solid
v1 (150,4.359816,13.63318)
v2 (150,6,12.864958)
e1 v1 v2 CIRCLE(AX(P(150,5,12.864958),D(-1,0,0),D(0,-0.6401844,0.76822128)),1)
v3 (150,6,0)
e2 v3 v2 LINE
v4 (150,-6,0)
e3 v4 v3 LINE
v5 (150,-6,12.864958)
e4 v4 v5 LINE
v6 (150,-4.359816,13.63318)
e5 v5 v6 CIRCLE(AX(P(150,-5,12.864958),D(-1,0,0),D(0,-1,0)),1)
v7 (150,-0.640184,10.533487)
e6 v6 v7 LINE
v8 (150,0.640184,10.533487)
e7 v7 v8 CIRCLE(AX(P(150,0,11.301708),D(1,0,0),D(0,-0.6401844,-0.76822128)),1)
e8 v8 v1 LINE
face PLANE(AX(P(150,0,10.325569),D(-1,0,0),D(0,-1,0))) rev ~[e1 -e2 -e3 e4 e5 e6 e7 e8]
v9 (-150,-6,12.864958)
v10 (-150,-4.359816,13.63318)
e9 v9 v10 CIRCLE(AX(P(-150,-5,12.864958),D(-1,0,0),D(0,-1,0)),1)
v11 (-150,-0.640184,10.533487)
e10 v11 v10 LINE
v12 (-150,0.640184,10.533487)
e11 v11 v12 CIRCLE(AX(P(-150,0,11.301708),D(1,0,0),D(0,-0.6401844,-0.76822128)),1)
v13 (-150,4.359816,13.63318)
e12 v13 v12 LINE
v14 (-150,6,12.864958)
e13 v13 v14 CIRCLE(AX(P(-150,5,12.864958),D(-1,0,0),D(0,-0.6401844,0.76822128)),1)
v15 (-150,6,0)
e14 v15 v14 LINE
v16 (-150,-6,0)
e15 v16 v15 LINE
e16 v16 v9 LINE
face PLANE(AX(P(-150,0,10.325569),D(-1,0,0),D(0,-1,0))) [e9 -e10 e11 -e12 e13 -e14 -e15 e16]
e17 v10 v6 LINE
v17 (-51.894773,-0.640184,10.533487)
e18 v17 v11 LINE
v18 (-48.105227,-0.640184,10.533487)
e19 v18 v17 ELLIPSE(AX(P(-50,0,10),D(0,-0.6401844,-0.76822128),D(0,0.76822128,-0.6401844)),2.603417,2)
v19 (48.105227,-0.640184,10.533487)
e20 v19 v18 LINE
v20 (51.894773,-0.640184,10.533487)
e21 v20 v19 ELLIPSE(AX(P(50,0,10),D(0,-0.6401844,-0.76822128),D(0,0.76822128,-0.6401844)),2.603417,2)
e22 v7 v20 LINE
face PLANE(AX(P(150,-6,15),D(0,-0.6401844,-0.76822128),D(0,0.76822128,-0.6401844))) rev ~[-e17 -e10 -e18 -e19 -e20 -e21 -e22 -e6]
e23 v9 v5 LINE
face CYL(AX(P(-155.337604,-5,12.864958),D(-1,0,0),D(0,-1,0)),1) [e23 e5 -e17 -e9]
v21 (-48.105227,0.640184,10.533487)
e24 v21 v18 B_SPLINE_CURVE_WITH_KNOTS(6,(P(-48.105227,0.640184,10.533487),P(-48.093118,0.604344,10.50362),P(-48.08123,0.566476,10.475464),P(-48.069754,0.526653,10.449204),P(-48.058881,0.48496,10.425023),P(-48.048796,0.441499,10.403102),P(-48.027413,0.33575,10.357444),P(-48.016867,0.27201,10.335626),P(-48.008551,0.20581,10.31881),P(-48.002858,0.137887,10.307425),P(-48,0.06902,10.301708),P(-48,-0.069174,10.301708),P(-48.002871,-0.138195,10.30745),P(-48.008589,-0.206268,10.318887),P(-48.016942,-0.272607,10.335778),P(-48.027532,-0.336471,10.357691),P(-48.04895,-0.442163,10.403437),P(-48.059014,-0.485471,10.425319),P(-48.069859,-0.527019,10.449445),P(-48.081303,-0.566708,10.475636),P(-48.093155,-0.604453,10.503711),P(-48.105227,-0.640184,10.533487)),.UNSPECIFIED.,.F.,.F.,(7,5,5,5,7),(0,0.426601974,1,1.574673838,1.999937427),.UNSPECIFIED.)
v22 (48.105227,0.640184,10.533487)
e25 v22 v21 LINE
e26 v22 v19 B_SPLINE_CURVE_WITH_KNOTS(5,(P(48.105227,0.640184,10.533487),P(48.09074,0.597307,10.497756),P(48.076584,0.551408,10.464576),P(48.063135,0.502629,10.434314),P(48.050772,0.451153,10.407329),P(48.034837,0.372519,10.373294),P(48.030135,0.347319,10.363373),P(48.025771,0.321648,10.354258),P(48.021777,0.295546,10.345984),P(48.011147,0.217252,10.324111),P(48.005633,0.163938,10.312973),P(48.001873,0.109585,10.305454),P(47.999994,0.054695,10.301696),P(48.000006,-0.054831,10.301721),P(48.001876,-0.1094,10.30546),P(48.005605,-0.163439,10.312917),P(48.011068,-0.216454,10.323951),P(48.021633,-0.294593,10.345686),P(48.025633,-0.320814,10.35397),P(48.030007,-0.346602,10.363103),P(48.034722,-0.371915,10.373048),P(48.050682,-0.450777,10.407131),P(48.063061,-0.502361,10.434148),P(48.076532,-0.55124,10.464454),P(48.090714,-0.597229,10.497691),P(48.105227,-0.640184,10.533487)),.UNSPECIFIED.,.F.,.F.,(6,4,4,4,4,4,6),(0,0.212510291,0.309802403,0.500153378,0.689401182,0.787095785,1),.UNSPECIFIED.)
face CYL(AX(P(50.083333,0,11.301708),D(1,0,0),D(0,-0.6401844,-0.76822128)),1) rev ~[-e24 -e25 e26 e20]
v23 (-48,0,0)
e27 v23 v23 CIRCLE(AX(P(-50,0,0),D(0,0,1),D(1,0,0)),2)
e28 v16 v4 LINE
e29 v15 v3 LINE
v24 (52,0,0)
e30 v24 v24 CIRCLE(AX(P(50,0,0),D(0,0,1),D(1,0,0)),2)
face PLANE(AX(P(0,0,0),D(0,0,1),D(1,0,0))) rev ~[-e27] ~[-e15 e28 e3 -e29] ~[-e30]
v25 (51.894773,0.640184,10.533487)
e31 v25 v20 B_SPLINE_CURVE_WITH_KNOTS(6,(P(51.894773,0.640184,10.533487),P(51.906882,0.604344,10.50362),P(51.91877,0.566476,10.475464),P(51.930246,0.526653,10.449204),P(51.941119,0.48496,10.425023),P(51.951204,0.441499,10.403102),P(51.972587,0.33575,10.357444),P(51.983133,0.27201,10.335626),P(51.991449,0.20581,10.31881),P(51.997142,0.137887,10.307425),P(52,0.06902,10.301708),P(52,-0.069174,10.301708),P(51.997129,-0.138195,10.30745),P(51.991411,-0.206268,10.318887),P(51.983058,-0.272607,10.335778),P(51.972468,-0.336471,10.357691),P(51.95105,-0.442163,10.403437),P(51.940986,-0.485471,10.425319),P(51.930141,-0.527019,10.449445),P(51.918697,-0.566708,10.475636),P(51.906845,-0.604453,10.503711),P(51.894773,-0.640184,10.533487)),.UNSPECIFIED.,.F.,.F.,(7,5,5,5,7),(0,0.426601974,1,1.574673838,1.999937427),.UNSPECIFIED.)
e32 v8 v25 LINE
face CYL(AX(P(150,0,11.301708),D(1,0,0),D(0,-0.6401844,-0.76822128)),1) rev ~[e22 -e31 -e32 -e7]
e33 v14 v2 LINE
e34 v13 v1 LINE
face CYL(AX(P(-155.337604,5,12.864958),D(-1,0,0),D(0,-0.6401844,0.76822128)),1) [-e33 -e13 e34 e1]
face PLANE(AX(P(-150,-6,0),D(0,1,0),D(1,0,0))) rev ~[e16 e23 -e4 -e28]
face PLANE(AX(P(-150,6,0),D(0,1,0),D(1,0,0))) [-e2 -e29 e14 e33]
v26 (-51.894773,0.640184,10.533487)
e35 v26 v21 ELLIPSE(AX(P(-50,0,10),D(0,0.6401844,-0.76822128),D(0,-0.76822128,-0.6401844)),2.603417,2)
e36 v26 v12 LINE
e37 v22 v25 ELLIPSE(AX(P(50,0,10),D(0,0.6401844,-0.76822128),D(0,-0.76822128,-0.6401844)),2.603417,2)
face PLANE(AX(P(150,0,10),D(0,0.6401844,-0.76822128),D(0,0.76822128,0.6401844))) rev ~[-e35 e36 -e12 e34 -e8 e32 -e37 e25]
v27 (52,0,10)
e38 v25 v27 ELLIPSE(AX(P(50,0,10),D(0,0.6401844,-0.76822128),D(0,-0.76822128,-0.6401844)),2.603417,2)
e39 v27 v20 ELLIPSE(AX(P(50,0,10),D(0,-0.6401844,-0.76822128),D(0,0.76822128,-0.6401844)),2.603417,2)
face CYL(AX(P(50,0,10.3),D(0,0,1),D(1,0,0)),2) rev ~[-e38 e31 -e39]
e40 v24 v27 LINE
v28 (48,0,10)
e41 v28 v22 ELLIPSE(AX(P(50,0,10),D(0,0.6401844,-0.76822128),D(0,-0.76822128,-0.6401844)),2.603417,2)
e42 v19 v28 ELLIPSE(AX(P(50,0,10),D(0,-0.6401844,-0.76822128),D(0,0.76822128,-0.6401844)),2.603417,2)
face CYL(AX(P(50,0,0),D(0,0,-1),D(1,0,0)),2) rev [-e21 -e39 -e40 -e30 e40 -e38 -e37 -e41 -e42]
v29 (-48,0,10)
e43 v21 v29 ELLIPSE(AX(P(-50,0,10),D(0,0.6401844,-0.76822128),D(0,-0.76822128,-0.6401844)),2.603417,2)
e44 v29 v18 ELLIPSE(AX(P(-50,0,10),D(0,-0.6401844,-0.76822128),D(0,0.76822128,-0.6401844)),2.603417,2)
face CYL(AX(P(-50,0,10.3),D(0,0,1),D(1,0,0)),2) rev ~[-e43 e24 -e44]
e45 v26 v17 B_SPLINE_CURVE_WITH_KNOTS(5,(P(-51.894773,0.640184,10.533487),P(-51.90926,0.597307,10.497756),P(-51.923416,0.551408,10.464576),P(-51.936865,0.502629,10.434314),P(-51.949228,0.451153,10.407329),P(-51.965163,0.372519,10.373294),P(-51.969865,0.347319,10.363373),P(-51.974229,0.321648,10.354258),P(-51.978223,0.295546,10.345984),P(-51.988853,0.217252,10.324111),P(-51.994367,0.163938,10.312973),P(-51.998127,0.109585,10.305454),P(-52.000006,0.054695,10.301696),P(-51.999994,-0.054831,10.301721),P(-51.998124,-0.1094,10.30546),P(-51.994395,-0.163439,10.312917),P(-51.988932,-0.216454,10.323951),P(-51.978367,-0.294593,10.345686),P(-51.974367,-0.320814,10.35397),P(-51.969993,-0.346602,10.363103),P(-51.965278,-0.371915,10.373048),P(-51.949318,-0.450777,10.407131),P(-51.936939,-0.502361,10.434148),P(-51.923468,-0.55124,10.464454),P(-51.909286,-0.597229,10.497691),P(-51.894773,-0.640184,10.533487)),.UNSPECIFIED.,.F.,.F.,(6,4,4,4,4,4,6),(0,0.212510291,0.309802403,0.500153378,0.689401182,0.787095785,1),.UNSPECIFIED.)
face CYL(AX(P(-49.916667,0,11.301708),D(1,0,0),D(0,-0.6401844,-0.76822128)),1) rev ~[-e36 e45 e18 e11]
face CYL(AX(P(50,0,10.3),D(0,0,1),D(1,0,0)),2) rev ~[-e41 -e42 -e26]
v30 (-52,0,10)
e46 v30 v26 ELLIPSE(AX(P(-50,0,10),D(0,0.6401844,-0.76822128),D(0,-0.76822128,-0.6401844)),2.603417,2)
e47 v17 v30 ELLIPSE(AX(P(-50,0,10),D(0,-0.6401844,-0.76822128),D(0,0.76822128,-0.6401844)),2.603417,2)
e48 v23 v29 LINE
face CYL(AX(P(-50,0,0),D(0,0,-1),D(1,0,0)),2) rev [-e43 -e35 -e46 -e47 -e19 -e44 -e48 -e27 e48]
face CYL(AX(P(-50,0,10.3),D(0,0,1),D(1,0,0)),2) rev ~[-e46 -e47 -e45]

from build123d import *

# Parameters (mm, degrees)
F0_W         = 300
F0_H         = 12
F0_R         = 2
F1_DEPTH     = 15
F3_DEPTH     = 300.001
F4_T4_DEPTH  = 100.0833333333
F4_S5_R      = 2
F4_T6_DEPTH  = 52
F4_T10_DEPTH = 100.1666666667
F4_S11_R     = 2
F4_T12_DEPTH = 52
F4_S13_R     = 2
F4_T14_DEPTH = 52
F4_T18_DEPTH = 100.0833333333
F4_S19_R     = 2
F4_T20_DEPTH = 52
F4_T21_DEPTH = 310.6752080633


# Not quite as in the source:
# - a fillet or chamfer that OpenCascade refuses, or shapes differently, is made with other operations: its cross-section is extruded or revolved along the edge and cut away or added


with BuildPart() as f1:
    # F0 (on Top) → F1 (new body)
    with BuildSketch(Plane.XY):
        Rectangle(F0_W, F0_H)
        with Locations((-50, 0)):
            Circle(F0_R, mode=Mode.SUBTRACT)
        with Locations((50, 0)):
            Circle(F0_R, mode=Mode.SUBTRACT)
    extrude(amount=F1_DEPTH)

    # F2 (on face) → F3 (cut, through all)
    with BuildSketch(Plane.YZ.offset(150)):
        Polygon((6, 15), (-6, 15), (0, 10), align=None)
    extrude(amount=-F3_DEPTH, mode=Mode.SUBTRACT)

    # F4: fillet of radius 1 on 5 edges, made by hand


with BuildPart() as f4_tool2:
    # F4_s3 → F4_t4 (new body)
    with BuildSketch(Plane.YZ.offset(150)):
        with BuildLine():
            ThreePointArc((-0.6401843997, 10.5334869997), (0, 10.3017082793), (0.6401843997, 10.5334869997))
            Line((0.6401843997, 10.5334869997), (0, 10))
            Line((0, 10), (-0.6401843997, 10.5334869997))
        make_face()
    extrude(amount=-F4_T4_DEPTH)

    # F4_s5 → F4_t6 (cut, symmetric)
    with BuildSketch(Plane.XY.offset(10.3)):
        with Locations((50, 0)):
            Circle(F4_S5_R)
    extrude(amount=F4_T6_DEPTH, both=True, mode=Mode.SUBTRACT)


with BuildPart() as f1_1:
    add(f1.part)

    # F4_t1: union F4_tool2
    add(f4_tool2.part)


with BuildPart() as f4_tool8:
    # F4_s9 → F4_t10 (new body)
    with BuildSketch(Plane.YZ.offset(50.0833333333)):
        with BuildLine():
            ThreePointArc((-0.6401843997, 10.5334869997), (0, 10.3017082793), (0.6401843997, 10.5334869997))
            Line((0.6401843997, 10.5334869997), (0, 10))
            Line((0, 10), (-0.6401843997, 10.5334869997))
        make_face()
    extrude(amount=-F4_T10_DEPTH)

    # F4_s11 → F4_t12 (cut, symmetric)
    with BuildSketch(Plane.XY.offset(10.3)):
        with Locations((50, 0)):
            Circle(F4_S11_R)
    extrude(amount=F4_T12_DEPTH, both=True, mode=Mode.SUBTRACT)

    # F4_s13 → F4_t14 (cut, symmetric)
    with BuildSketch(Plane.XY.offset(10.3)):
        with Locations((-50, 0)):
            Circle(F4_S13_R)
    extrude(amount=F4_T14_DEPTH, both=True, mode=Mode.SUBTRACT)


with BuildPart() as f1_2:
    add(f1_1.part)

    # F4_t7: union F4_tool8
    add(f4_tool8.part)


with BuildPart() as f4_tool16:
    # F4_s17 → F4_t18 (new body)
    with BuildSketch(Plane.YZ.offset(-49.9166666667)):
        with BuildLine():
            ThreePointArc((-0.6401843997, 10.5334869997), (0, 10.3017082793), (0.6401843997, 10.5334869997))
            Line((0.6401843997, 10.5334869997), (0, 10))
            Line((0, 10), (-0.6401843997, 10.5334869997))
        make_face()
    extrude(amount=-F4_T18_DEPTH)

    # F4_s19 → F4_t20 (cut, symmetric)
    with BuildSketch(Plane.XY.offset(10.3)):
        with Locations((-50, 0)):
            Circle(F4_S19_R)
    extrude(amount=F4_T20_DEPTH, both=True, mode=Mode.SUBTRACT)


with BuildPart() as f1_3:
    add(f1_2.part)

    # F4_t15: union F4_tool16
    add(f4_tool16.part)

    # F4_s22 → F4_t21 (cut)
    with BuildSketch(Plane.YZ.offset(-155.3376040316)):
        with BuildLine():
            ThreePointArc((-6, 12.8649583873), (-5.4241553962, 13.7705478086), (-4.3598156003, 13.6331796669))
            Line((-4.3598156003, 13.6331796669), (-6, 15))
            Line((-6, 15), (-6, 12.8649583873))
        make_face()
        with BuildLine():
            ThreePointArc((4.3598156003, 13.6331796669), (5.4241553962, 13.7705478086), (6, 12.8649583873))
            Line((6, 12.8649583873), (6, 15))
            Line((6, 15), (4.3598156003, 13.6331796669))
        make_face()
    extrude(amount=F4_T21_DEPTH, mode=Mode.SUBTRACT)


solid = f1_3.part
